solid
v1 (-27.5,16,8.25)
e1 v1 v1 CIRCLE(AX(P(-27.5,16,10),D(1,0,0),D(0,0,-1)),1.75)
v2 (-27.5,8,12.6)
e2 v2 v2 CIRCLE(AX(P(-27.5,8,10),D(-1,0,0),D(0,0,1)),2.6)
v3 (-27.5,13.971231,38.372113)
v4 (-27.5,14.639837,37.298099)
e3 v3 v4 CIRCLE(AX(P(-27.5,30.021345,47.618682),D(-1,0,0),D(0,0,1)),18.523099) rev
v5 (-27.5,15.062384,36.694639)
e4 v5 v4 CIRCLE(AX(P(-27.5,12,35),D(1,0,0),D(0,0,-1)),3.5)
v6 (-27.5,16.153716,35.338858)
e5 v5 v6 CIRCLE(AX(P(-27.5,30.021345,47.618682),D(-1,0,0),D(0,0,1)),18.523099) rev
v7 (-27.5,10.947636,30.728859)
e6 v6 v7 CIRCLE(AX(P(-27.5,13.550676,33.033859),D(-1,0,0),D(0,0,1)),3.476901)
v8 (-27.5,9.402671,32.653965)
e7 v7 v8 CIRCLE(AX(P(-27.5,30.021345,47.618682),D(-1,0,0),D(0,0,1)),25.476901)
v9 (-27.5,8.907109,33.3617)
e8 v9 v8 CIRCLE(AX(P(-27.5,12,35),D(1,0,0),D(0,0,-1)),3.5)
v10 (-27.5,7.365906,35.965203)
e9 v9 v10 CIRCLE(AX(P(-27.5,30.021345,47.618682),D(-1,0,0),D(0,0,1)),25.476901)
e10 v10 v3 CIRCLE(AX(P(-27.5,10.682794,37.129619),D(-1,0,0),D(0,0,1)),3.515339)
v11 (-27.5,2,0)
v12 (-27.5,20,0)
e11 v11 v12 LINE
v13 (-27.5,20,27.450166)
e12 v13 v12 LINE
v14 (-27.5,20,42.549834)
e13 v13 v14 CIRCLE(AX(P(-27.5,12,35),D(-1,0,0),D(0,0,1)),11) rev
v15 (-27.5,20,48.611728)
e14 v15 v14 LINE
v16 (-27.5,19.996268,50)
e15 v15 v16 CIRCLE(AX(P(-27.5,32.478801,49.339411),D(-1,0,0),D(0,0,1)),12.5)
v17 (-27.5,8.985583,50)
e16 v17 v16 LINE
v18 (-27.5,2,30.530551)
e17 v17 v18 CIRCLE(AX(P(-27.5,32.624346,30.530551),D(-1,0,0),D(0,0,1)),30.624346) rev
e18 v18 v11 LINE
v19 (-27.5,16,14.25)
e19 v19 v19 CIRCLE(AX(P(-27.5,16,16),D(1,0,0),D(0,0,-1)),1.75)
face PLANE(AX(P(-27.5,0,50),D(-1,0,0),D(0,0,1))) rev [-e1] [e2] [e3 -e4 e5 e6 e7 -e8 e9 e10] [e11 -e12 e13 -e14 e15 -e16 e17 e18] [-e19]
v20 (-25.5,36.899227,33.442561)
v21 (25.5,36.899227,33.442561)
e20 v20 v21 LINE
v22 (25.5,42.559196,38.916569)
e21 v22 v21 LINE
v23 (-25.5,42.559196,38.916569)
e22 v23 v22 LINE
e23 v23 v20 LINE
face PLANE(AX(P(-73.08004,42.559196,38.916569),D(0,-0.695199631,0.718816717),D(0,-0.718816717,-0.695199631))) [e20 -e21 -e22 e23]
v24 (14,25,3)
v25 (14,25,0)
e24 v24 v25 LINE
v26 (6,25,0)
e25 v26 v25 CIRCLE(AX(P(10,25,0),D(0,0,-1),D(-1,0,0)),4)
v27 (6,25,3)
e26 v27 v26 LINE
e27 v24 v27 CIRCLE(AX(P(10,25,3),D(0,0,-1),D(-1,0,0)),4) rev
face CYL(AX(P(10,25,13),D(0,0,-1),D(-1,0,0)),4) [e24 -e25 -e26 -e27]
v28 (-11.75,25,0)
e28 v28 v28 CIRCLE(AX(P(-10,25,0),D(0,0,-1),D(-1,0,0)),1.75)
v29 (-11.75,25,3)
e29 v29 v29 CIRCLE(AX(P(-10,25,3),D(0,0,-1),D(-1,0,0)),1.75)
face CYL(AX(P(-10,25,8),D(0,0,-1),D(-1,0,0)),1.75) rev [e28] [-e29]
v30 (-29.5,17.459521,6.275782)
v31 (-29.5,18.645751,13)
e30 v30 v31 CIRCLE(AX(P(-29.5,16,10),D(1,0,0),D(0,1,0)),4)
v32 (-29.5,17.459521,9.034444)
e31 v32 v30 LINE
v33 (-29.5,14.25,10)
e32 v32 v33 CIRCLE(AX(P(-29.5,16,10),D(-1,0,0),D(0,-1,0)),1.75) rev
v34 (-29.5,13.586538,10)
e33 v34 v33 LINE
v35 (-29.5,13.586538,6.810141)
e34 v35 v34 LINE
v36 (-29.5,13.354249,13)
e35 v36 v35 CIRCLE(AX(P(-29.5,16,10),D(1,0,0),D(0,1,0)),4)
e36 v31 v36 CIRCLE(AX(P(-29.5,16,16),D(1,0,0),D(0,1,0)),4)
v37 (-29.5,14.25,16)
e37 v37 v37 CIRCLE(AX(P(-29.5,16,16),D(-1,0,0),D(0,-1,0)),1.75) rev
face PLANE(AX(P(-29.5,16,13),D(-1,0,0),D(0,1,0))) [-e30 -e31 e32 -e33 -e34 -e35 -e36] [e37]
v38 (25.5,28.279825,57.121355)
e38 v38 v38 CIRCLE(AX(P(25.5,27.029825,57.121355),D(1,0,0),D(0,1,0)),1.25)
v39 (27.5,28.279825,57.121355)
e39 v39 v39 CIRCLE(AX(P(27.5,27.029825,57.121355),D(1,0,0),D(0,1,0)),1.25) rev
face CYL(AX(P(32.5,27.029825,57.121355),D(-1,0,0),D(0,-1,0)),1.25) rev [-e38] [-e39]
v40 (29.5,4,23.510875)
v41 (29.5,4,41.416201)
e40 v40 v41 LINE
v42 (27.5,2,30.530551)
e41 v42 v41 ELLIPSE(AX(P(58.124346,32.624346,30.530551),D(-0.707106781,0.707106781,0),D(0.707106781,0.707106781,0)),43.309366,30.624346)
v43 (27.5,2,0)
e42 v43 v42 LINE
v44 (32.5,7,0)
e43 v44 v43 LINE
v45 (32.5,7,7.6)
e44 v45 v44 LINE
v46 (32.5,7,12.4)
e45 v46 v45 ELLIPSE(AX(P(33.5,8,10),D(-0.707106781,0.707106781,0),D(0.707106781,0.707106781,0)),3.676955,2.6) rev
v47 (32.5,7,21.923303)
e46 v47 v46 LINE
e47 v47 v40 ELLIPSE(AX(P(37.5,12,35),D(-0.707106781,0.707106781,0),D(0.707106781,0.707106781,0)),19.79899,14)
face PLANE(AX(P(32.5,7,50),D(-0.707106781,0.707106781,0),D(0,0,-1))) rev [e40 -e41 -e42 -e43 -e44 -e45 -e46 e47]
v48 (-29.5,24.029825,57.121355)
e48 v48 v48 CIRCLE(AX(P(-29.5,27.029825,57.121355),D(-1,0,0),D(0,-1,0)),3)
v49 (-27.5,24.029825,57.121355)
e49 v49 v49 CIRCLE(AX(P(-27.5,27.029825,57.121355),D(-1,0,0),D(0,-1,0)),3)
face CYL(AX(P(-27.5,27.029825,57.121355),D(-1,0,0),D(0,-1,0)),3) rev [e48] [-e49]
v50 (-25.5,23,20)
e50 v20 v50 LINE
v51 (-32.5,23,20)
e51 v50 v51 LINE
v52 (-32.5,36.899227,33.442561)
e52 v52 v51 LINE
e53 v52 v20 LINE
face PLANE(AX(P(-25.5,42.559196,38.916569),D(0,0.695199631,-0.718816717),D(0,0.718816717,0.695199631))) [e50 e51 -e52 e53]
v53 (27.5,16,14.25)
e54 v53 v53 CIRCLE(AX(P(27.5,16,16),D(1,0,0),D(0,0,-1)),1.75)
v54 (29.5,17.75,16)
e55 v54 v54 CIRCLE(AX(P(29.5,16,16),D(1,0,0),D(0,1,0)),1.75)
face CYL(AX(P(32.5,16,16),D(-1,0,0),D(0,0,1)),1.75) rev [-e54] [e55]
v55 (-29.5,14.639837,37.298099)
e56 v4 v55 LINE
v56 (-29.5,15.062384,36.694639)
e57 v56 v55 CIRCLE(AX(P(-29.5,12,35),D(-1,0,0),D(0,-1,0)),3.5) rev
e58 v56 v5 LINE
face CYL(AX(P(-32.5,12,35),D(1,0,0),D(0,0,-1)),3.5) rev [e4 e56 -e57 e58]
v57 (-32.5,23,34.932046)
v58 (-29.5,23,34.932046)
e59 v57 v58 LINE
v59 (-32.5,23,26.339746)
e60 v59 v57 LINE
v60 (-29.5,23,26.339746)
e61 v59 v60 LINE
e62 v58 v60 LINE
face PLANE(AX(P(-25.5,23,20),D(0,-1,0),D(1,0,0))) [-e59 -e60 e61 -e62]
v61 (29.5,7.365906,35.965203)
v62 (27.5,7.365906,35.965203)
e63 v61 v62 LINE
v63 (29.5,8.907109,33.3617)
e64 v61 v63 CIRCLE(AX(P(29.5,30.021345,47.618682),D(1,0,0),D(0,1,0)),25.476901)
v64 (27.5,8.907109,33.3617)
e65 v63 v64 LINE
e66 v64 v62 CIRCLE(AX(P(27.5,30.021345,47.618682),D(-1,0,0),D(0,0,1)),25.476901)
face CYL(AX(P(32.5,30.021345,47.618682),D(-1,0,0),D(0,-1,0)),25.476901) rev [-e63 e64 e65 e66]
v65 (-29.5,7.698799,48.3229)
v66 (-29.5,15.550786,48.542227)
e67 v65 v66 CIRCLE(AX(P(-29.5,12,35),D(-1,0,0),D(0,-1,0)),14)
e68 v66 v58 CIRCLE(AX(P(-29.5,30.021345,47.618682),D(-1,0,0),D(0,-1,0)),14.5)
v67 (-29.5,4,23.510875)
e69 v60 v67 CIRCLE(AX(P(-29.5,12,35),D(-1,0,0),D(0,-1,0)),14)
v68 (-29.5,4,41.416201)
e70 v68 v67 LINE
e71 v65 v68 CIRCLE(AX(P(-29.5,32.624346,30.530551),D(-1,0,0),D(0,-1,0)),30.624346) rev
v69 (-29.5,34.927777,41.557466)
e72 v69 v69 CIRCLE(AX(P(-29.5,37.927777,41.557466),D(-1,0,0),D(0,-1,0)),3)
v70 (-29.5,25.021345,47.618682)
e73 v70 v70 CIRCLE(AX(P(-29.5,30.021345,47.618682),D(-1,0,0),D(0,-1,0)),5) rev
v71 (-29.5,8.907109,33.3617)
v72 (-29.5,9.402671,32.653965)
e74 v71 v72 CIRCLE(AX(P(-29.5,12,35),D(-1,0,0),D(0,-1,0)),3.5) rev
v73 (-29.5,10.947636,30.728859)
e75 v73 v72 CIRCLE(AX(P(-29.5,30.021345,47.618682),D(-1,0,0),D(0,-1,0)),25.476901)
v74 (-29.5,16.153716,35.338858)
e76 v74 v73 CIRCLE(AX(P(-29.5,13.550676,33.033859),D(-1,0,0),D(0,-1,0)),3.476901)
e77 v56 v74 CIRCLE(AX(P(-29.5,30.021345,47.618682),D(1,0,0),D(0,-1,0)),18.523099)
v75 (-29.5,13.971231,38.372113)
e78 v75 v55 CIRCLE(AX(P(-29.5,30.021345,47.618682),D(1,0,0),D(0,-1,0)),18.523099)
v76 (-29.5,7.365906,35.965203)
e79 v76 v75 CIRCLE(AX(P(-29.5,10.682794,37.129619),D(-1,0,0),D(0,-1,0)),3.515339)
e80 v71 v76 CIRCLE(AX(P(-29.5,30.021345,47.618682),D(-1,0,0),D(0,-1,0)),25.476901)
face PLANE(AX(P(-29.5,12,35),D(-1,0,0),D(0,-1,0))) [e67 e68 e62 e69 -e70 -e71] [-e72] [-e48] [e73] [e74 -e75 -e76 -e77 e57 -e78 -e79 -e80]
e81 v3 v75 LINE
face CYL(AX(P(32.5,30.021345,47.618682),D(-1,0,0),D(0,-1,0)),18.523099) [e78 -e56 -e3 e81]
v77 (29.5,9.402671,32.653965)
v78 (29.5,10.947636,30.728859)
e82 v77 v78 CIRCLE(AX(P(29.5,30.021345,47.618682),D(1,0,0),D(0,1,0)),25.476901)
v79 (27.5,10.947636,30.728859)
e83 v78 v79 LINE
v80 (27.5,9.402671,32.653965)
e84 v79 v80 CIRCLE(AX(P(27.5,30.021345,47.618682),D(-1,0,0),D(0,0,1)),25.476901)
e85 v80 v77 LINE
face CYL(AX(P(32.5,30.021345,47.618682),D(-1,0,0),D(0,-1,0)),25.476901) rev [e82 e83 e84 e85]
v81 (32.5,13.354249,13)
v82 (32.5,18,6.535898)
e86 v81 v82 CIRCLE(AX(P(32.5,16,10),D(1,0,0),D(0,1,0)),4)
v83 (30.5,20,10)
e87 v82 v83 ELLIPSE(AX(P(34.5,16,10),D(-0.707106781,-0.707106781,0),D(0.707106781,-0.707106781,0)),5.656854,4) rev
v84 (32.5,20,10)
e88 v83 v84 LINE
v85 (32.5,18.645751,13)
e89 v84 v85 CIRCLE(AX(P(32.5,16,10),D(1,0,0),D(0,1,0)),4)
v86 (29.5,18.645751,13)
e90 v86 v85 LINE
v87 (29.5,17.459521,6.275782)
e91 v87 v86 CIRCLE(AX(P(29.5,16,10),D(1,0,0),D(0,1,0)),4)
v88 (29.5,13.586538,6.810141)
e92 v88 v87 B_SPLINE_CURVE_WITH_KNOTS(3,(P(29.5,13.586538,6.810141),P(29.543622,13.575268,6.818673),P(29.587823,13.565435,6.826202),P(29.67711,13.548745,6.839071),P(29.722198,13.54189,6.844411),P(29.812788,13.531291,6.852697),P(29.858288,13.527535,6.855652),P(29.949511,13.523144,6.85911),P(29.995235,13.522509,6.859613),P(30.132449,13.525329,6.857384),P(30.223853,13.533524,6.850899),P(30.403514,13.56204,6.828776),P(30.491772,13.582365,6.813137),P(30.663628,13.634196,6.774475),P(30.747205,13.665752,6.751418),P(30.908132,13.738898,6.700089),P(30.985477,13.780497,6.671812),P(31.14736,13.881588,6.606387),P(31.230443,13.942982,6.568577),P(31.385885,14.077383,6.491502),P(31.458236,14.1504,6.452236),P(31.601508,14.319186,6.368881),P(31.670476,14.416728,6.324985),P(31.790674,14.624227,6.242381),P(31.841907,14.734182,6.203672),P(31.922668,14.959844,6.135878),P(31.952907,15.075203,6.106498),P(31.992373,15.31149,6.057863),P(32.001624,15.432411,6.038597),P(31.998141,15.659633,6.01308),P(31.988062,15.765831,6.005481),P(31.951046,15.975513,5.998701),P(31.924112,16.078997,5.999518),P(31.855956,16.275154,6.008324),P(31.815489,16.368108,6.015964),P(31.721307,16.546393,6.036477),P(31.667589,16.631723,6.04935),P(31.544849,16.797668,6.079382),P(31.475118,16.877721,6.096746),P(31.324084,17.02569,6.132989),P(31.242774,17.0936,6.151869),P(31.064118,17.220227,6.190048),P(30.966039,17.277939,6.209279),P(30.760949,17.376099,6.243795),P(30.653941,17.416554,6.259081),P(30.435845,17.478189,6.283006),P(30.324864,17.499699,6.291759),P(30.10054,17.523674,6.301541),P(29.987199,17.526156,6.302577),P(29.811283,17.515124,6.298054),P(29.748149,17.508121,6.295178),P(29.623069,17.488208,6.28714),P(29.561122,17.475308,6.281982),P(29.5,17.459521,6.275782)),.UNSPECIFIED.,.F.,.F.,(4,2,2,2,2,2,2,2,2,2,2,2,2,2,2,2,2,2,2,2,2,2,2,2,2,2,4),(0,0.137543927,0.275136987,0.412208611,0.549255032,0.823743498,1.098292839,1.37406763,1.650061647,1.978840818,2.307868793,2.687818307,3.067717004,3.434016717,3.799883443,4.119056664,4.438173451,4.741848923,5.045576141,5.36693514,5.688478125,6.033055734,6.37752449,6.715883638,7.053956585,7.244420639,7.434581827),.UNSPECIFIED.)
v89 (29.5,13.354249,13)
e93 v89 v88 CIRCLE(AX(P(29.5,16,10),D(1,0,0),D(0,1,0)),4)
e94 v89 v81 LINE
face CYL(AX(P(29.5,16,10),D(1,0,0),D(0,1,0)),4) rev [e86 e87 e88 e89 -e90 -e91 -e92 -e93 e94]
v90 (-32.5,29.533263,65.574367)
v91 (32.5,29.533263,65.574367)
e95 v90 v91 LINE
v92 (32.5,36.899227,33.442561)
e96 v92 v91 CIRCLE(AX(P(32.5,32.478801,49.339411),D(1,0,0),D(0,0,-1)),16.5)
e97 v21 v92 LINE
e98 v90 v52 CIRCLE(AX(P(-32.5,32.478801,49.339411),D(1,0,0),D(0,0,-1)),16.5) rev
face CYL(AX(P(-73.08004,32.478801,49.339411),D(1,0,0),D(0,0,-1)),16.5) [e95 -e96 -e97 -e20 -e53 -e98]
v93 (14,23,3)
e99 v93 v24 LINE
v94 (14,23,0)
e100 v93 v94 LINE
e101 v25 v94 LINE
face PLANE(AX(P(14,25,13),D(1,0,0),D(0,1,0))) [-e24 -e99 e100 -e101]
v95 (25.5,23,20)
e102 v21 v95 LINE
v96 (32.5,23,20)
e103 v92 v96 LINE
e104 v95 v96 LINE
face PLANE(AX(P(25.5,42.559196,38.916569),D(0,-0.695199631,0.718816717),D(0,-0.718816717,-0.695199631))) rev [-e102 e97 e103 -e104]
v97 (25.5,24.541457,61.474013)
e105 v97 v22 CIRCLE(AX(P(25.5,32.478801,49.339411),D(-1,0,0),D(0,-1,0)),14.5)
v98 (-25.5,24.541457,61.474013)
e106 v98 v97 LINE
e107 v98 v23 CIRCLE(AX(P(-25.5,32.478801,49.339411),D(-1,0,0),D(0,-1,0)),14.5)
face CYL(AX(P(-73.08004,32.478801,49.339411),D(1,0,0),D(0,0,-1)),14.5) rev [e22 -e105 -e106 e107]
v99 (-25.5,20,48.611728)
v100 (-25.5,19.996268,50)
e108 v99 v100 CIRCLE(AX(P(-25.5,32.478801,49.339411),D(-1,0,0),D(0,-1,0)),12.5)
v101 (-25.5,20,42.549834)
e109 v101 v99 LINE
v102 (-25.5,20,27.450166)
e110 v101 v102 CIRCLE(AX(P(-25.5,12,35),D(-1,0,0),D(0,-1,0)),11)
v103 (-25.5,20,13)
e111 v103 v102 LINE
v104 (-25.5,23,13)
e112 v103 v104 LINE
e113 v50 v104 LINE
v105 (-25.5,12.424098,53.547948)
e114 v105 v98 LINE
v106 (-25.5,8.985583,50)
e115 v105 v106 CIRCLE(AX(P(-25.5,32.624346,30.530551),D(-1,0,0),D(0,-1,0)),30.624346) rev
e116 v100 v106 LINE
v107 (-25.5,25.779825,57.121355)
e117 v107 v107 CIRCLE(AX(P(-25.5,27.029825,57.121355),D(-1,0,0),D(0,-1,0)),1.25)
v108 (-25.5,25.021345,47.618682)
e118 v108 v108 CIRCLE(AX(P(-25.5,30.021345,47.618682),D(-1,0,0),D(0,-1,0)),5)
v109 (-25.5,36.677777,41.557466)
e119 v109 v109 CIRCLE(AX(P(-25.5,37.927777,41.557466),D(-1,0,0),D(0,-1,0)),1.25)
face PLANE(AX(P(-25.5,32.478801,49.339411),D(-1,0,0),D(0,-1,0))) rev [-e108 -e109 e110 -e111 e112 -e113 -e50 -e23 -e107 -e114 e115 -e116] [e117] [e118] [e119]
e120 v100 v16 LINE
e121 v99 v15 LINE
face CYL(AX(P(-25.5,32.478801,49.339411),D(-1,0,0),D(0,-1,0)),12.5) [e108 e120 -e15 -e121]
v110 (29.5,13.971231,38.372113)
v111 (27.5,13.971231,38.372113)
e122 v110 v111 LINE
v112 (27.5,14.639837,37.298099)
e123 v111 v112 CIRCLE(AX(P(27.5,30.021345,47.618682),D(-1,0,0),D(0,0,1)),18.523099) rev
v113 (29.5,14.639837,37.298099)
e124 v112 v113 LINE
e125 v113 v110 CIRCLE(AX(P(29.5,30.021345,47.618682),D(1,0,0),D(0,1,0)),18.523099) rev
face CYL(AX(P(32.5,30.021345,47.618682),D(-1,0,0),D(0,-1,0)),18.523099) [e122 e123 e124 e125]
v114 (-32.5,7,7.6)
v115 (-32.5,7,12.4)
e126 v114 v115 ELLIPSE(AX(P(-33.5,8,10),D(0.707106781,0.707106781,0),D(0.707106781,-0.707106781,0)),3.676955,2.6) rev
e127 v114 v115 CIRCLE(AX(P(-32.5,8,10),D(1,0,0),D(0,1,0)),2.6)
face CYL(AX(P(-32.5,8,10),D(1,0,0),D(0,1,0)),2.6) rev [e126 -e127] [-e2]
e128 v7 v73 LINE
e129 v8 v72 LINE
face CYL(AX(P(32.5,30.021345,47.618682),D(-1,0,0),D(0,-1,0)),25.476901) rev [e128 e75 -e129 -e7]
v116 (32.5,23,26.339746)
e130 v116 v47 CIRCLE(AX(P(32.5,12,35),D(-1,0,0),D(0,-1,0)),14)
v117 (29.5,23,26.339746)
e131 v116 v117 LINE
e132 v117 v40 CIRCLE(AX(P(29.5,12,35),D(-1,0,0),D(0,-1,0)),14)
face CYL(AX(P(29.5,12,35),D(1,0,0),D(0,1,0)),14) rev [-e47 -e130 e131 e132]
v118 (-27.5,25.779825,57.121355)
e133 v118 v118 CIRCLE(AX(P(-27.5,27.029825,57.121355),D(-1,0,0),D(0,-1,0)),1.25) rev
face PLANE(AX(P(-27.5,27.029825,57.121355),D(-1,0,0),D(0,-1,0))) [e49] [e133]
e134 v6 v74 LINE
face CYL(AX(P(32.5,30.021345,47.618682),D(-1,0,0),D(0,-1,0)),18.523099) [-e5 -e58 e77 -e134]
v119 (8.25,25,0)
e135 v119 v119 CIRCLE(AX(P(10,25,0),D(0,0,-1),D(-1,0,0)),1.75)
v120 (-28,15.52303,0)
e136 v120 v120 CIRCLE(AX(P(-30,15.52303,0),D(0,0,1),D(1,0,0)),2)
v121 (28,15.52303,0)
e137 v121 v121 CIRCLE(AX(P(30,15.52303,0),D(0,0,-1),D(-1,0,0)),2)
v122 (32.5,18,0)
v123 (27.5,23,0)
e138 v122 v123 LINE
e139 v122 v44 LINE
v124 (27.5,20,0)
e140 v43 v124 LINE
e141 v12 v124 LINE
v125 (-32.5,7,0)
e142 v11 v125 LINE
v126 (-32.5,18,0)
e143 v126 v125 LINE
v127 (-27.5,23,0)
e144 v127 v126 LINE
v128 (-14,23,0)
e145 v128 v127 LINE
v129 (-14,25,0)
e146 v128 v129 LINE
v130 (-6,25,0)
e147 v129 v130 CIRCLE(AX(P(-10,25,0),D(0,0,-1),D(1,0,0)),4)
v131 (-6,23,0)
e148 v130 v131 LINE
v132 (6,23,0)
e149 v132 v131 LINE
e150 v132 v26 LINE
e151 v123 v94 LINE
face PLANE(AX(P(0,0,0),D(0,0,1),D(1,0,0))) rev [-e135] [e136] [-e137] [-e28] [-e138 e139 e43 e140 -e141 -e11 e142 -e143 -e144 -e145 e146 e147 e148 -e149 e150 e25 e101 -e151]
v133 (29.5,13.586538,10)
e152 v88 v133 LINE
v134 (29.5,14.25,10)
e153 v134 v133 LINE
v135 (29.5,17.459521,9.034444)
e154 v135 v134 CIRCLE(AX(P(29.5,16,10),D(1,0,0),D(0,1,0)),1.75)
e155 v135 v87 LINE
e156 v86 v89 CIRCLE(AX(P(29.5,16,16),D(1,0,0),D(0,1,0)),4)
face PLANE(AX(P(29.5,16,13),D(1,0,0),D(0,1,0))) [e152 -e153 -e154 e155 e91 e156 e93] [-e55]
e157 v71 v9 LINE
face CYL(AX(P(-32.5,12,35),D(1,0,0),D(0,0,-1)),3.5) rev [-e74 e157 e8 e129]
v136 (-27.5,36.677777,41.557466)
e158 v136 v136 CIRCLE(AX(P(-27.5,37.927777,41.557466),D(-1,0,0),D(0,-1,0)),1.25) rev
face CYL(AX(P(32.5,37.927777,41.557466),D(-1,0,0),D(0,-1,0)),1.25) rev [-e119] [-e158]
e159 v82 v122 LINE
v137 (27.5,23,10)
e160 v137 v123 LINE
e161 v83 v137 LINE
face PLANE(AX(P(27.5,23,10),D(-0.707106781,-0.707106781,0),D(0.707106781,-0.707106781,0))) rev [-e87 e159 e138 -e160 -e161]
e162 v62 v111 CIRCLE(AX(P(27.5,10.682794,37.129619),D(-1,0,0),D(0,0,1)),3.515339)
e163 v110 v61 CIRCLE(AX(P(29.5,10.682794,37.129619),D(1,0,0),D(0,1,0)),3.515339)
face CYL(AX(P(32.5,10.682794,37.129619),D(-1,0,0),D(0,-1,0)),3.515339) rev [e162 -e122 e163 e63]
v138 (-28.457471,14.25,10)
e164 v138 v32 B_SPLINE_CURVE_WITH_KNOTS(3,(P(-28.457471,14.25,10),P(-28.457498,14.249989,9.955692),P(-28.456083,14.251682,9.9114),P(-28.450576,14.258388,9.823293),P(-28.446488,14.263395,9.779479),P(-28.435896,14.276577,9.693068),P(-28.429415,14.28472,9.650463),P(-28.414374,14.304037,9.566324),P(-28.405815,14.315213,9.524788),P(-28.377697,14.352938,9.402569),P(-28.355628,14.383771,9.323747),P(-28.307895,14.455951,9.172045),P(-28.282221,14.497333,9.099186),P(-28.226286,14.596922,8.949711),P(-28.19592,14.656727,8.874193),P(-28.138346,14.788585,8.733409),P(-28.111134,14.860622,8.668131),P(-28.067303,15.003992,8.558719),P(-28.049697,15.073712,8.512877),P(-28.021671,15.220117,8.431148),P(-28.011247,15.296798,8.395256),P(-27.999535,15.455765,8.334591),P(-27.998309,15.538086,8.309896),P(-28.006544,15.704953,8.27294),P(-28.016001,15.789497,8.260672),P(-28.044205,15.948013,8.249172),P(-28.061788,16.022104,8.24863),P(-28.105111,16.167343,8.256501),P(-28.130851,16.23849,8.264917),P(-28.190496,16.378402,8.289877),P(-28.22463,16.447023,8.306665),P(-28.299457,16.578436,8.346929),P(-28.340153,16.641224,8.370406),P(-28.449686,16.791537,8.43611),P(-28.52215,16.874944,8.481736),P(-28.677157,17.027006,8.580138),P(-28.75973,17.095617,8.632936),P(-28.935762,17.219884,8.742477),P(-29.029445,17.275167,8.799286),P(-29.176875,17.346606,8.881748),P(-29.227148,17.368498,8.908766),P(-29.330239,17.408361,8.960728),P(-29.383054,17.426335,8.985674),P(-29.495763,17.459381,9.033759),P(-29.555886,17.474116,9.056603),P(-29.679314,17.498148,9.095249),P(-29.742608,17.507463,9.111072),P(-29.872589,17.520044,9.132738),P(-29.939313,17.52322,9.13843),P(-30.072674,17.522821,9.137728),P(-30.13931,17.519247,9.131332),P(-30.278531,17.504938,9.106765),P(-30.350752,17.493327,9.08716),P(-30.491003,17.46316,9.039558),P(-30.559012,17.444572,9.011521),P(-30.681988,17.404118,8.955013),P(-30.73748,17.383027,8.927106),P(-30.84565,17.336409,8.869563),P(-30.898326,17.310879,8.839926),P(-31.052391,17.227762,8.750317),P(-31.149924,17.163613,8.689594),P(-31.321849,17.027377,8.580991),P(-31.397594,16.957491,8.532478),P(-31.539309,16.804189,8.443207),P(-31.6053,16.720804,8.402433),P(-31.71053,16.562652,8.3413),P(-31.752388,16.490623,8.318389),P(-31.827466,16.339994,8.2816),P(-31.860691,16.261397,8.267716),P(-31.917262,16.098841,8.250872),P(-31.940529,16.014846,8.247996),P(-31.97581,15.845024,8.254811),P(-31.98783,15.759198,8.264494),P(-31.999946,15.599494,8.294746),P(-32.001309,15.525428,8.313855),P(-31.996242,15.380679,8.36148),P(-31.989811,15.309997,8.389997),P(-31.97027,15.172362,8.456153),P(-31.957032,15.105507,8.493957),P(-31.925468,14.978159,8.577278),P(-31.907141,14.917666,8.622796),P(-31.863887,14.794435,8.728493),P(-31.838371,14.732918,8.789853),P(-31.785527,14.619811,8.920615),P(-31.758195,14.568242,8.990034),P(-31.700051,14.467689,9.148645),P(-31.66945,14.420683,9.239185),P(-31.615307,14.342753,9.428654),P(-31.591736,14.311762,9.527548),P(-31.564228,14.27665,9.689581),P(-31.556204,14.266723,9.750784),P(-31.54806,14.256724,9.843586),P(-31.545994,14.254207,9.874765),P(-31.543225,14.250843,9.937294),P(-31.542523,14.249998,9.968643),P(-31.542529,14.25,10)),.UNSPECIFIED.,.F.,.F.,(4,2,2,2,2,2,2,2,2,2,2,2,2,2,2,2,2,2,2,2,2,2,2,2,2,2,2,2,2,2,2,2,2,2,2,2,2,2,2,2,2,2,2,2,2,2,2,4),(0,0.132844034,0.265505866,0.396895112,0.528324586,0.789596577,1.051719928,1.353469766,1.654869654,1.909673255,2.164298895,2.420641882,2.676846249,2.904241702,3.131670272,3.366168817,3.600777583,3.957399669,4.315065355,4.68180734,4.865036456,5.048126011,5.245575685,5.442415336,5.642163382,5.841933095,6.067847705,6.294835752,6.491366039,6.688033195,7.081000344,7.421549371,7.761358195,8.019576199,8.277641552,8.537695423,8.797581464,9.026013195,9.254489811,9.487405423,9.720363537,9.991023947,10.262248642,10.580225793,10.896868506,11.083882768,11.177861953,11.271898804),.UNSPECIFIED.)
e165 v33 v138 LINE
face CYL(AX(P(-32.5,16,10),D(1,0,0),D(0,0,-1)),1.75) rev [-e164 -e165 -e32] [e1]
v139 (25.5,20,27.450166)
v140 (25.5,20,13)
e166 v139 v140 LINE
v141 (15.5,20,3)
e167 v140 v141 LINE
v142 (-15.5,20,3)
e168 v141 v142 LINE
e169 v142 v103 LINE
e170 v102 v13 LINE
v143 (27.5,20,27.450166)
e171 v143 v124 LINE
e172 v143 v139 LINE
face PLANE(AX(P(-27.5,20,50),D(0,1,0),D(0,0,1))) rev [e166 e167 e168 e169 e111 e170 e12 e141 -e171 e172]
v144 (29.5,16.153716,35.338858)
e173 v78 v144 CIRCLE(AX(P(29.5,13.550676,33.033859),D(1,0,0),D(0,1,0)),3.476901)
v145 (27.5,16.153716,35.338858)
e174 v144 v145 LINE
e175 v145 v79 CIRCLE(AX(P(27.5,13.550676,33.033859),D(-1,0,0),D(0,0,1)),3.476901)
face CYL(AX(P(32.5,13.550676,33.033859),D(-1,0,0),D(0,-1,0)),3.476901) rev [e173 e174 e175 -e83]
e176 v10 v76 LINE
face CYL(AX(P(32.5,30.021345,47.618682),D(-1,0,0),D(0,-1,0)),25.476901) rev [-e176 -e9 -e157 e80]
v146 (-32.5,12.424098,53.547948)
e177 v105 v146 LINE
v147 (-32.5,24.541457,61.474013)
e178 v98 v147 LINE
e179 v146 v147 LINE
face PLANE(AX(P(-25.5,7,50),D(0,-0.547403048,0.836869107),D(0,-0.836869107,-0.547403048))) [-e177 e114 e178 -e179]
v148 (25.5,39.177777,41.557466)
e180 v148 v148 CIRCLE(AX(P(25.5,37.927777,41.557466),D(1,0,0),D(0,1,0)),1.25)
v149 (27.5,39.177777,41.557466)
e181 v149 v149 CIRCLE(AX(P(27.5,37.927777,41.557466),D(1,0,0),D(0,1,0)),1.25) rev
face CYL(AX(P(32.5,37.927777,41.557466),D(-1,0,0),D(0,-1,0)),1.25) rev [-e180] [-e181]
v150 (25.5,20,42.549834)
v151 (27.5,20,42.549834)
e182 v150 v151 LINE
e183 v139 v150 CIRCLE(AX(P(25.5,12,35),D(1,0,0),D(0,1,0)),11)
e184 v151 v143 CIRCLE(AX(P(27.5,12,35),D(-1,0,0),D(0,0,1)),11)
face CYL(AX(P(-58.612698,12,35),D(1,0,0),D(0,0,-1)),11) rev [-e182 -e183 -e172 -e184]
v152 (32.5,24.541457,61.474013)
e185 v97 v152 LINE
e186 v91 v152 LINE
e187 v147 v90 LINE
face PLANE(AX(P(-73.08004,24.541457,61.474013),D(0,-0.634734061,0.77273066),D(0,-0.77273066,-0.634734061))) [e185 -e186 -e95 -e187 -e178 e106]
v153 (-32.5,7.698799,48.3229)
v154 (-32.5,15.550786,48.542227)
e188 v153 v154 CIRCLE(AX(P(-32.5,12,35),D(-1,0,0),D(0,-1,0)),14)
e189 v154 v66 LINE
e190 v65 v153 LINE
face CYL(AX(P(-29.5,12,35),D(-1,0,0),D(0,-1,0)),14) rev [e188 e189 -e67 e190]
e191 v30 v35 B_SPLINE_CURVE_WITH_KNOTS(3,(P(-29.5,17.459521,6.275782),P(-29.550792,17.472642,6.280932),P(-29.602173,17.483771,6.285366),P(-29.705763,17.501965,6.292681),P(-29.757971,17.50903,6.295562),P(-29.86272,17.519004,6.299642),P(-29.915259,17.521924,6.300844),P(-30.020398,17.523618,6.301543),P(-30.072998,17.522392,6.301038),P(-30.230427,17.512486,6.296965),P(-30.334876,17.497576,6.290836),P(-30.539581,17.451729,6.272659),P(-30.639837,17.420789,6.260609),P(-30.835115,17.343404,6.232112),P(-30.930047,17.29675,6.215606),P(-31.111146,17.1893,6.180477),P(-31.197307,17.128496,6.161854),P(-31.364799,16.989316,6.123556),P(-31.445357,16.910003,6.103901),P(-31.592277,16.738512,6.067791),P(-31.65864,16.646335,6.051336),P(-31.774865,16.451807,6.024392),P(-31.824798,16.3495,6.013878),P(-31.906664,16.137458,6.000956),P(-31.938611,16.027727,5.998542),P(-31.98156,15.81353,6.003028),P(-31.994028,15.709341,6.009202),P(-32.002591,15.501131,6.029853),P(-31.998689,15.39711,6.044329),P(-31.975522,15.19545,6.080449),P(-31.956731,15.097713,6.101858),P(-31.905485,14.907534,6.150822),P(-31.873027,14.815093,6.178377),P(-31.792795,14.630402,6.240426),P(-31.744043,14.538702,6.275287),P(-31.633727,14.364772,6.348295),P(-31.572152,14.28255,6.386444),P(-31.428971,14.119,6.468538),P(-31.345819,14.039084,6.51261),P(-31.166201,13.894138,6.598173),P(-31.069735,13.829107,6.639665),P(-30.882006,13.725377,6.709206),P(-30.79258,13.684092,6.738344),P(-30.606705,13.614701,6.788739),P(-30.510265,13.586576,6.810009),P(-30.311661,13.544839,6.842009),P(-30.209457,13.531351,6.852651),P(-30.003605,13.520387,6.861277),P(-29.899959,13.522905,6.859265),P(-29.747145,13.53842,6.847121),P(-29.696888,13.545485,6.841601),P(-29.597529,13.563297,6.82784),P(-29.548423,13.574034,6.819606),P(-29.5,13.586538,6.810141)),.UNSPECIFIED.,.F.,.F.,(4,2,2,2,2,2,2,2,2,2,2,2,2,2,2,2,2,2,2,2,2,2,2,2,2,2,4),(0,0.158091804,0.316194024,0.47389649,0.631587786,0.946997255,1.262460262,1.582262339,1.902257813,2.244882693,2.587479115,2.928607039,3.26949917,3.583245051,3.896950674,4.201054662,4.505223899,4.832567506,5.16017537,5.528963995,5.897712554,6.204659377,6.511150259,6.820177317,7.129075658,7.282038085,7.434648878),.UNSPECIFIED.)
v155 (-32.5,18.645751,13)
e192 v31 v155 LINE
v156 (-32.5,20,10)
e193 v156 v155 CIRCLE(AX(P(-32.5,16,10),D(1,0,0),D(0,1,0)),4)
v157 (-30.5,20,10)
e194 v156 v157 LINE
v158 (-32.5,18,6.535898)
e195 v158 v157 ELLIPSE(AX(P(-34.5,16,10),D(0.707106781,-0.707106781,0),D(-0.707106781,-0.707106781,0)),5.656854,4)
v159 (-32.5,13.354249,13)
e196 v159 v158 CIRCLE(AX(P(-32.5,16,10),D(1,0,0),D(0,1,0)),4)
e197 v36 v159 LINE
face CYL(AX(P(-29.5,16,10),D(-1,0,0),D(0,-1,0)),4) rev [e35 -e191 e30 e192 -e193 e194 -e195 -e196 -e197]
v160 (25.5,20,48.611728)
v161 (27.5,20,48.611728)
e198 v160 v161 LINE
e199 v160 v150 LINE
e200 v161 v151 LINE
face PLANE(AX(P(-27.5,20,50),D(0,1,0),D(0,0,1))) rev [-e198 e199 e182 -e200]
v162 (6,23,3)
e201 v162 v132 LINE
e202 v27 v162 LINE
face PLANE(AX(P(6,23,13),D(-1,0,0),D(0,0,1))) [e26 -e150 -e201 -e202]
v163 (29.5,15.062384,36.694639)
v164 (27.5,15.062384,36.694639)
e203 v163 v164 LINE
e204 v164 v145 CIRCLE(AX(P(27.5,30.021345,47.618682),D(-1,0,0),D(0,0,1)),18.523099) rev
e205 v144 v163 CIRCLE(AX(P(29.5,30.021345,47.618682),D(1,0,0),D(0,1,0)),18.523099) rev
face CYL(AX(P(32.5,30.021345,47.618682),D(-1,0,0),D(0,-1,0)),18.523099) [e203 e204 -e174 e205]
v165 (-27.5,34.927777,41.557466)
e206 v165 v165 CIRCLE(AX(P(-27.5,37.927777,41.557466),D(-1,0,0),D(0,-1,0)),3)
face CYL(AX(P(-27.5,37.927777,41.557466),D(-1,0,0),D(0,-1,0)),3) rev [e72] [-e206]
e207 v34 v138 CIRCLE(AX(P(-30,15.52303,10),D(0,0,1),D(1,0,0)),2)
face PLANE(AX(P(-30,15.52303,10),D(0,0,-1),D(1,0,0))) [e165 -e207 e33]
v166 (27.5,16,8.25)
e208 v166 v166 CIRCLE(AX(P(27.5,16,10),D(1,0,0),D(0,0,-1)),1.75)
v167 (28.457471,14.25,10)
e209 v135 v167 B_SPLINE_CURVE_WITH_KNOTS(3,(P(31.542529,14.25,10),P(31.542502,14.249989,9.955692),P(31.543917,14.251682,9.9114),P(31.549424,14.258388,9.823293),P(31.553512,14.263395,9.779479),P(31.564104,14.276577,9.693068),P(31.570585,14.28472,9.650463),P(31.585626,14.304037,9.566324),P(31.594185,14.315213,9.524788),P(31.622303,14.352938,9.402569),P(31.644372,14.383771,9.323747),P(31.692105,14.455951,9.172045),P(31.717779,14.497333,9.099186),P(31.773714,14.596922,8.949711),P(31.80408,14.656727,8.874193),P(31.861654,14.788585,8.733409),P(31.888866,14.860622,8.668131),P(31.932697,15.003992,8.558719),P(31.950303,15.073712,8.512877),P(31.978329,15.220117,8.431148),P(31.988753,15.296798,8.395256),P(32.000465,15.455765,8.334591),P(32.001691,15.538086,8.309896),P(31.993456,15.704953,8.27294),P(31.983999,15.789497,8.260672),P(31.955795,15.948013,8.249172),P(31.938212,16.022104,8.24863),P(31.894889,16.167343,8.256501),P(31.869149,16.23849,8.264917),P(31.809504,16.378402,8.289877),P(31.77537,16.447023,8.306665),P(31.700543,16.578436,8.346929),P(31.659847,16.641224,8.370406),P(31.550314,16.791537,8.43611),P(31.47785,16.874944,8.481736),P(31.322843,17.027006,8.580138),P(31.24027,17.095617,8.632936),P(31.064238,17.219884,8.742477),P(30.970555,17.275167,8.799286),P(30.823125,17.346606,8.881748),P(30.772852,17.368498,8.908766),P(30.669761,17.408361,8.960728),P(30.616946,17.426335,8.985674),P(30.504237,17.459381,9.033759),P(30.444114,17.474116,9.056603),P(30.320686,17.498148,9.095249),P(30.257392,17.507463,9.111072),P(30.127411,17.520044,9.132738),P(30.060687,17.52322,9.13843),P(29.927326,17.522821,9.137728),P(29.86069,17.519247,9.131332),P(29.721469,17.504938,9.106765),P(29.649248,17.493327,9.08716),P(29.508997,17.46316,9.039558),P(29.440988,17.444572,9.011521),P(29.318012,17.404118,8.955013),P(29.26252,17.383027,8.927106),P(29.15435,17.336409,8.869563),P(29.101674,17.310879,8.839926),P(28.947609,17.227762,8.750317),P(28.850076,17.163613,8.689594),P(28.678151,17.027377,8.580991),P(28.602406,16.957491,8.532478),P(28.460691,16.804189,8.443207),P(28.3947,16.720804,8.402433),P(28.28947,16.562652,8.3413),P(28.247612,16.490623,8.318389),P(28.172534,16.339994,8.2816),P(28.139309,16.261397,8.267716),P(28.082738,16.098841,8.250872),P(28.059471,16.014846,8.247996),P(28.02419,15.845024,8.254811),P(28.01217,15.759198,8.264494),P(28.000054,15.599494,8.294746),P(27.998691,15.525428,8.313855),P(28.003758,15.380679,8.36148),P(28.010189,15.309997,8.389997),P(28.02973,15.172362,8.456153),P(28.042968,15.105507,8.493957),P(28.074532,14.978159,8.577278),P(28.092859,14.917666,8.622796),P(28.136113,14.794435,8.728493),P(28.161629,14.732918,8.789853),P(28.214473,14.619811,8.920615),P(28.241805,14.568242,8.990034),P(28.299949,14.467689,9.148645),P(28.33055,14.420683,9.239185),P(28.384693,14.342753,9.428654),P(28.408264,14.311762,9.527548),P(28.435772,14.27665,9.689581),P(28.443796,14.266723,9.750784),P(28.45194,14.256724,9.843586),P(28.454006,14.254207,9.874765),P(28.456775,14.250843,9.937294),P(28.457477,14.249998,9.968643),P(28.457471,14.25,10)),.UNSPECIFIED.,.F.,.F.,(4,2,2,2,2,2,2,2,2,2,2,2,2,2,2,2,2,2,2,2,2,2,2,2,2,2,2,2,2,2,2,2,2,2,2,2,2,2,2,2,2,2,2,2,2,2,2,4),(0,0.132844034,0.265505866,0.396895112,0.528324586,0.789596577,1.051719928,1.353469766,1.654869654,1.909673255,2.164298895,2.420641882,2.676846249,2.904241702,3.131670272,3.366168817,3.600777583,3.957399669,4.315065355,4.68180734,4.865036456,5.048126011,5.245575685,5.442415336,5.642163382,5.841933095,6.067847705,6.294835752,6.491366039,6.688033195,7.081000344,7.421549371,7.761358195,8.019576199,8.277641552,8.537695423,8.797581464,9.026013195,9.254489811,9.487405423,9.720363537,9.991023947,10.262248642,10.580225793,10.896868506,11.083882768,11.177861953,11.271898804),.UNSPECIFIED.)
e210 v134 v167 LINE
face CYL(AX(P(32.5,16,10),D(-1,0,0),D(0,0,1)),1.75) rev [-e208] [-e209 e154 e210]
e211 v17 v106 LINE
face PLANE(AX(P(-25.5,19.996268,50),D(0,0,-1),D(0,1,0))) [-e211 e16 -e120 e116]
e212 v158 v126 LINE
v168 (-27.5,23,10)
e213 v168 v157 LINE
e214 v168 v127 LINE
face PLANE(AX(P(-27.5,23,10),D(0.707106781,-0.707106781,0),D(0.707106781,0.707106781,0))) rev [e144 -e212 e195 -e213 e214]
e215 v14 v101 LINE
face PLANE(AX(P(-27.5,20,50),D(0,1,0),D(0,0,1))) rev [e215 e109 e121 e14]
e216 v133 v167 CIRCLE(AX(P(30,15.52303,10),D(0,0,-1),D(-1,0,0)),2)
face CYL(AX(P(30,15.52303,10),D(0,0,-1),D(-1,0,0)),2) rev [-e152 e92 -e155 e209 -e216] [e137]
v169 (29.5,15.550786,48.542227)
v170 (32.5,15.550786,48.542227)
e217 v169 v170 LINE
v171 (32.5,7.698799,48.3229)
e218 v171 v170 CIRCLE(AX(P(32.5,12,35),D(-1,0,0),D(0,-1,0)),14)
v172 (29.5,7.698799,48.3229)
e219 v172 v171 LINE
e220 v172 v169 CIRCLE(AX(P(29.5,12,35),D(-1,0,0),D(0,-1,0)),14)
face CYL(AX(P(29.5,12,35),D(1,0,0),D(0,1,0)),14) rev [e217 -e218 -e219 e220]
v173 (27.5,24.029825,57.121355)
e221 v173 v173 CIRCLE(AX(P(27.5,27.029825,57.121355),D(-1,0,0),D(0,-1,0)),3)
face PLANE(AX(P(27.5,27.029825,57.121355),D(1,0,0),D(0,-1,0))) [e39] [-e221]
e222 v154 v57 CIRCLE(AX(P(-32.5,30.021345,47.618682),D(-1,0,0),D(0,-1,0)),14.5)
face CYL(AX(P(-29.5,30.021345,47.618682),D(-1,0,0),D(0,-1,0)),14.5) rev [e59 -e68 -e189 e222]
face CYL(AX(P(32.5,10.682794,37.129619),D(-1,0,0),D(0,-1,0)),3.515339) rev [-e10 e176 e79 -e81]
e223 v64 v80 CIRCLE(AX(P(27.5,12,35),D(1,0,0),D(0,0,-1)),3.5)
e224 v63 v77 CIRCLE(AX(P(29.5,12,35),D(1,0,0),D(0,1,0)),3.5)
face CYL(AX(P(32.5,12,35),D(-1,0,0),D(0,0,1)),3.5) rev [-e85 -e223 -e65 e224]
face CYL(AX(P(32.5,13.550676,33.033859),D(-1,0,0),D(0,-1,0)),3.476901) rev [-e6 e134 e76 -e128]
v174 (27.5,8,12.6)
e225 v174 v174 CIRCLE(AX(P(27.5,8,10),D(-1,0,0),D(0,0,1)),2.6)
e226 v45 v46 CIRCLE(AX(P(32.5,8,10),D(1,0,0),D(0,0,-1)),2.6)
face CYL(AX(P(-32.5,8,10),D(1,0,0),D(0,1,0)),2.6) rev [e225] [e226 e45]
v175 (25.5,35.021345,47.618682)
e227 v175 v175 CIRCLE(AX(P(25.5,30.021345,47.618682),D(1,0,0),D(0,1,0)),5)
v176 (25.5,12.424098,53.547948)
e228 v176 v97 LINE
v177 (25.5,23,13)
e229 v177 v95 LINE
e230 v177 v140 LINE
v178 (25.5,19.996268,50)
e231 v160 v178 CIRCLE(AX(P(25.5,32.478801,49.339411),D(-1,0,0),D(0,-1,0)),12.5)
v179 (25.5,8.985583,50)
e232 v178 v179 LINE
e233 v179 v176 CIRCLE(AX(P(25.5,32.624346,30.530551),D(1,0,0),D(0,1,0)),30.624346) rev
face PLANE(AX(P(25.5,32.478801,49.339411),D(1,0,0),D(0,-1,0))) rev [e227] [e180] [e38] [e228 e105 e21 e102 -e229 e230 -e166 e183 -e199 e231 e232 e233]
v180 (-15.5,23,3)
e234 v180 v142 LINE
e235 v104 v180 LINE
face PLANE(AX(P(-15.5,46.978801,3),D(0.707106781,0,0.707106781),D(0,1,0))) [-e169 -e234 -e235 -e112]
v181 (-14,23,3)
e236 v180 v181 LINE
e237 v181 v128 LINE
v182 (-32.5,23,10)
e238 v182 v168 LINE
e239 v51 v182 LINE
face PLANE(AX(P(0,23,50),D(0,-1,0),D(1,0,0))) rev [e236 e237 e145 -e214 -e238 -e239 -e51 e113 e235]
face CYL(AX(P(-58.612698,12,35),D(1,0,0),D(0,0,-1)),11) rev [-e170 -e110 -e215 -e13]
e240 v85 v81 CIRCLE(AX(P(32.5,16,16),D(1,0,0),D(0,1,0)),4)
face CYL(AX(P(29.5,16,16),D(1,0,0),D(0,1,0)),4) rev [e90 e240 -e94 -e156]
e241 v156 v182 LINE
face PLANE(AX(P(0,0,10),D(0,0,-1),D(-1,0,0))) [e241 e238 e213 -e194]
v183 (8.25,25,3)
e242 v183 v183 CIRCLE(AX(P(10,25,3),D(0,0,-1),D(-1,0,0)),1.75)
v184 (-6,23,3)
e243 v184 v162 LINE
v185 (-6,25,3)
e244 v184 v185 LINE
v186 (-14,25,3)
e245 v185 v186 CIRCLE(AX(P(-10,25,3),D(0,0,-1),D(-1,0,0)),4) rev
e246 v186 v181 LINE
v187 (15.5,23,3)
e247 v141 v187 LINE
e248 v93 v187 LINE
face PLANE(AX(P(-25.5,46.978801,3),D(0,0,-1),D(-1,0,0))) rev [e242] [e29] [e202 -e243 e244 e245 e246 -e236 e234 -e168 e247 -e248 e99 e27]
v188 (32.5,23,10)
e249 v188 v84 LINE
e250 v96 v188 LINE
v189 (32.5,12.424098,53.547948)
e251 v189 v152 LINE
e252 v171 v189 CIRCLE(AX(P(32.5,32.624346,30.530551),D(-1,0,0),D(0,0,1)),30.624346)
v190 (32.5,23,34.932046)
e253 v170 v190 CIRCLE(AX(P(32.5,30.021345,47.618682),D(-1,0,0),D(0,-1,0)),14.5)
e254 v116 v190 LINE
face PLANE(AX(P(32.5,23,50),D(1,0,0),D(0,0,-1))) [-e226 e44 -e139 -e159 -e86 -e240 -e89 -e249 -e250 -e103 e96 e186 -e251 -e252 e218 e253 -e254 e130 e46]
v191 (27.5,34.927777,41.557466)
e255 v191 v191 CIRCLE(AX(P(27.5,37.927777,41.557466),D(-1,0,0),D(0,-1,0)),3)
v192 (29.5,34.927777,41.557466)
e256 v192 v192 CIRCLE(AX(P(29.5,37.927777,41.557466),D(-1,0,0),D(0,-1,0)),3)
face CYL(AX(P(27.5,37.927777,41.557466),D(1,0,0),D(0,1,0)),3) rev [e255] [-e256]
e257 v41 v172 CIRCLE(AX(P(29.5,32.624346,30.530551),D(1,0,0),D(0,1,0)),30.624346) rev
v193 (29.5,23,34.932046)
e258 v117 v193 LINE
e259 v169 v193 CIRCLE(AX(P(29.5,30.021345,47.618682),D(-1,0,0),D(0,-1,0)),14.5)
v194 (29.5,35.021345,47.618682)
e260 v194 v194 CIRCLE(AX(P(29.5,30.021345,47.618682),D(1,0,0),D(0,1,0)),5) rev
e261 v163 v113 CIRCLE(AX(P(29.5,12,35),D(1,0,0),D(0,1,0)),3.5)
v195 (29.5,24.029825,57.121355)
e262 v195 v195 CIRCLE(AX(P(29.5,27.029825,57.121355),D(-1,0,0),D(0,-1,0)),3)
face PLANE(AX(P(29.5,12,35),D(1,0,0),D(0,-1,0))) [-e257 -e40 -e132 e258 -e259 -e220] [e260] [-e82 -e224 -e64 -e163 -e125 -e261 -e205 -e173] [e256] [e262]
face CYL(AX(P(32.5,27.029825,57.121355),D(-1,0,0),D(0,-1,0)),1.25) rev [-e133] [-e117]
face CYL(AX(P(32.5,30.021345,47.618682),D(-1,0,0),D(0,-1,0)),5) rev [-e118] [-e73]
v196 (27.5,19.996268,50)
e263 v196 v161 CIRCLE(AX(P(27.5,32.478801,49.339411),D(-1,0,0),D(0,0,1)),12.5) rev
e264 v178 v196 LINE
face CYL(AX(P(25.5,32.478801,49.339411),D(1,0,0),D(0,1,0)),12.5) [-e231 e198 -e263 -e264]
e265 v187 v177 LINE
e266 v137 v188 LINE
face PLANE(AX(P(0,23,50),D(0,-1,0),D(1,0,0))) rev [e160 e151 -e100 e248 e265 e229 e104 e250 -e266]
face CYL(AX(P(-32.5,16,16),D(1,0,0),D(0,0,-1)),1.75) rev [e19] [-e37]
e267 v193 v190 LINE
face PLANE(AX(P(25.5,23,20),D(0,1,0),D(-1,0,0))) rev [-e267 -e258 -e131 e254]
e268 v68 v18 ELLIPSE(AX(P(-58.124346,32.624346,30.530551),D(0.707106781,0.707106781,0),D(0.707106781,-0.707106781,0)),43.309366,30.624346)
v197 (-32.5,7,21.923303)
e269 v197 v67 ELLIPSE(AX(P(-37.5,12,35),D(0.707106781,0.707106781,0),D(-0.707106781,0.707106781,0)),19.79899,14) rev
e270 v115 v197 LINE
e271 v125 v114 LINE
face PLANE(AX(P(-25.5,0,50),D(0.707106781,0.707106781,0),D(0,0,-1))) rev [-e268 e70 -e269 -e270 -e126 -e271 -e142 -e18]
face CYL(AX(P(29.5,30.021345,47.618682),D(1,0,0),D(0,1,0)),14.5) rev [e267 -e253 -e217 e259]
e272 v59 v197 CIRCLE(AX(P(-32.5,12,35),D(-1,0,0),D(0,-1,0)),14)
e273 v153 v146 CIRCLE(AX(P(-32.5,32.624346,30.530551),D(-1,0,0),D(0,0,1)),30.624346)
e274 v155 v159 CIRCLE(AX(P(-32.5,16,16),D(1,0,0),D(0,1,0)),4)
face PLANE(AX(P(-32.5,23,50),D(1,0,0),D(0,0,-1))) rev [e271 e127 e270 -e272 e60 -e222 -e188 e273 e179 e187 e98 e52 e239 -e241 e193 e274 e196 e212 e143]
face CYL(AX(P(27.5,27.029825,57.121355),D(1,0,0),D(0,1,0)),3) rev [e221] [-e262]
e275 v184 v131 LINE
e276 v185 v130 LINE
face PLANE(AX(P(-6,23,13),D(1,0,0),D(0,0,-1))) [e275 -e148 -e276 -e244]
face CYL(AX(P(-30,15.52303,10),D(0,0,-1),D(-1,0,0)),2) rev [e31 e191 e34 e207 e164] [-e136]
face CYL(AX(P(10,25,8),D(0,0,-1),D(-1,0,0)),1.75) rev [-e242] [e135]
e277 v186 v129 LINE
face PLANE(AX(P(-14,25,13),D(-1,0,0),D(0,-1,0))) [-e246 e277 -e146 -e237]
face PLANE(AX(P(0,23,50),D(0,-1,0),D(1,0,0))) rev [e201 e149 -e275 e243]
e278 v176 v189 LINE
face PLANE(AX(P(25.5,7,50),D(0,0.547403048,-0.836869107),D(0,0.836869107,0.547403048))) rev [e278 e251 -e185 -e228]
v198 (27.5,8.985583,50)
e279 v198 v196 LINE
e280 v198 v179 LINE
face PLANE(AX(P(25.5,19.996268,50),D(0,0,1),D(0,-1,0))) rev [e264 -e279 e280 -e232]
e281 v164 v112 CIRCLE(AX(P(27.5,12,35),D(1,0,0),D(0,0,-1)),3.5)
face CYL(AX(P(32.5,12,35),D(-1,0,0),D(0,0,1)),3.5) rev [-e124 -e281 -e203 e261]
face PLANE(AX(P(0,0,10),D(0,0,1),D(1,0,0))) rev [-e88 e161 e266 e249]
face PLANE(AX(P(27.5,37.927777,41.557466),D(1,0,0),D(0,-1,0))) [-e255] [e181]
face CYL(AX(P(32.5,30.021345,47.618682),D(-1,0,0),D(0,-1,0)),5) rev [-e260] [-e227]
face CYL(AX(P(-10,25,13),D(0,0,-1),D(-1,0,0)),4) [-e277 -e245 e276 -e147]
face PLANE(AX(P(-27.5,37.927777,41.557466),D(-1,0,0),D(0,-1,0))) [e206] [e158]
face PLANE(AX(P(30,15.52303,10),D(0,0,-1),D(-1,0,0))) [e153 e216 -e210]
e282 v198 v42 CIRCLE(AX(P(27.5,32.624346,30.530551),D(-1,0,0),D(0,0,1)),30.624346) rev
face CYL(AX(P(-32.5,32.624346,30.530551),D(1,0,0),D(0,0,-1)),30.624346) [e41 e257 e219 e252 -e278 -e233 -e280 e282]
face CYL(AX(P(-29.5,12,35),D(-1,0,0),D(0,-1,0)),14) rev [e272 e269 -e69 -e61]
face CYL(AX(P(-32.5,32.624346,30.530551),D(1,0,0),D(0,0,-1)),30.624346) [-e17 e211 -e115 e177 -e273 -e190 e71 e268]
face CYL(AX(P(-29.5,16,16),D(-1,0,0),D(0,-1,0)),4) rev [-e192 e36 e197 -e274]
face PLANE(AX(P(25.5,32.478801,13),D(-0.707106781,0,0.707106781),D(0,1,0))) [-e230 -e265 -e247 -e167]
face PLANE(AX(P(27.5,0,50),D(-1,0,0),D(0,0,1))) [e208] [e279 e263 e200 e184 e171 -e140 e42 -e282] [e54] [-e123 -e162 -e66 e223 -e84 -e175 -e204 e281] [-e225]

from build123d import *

# Parameters (mm, degrees)
BOSS_EXTRUDE1_DEPTH             = 50
CHAMFER1_SIZE                   = 7
SKETCH2_R                       = 3.5
CUT_EXTRUDE1_DEPTH              = 62.524385409
SKETCH3_R                       = 1.75
CUT_EXTRUDE2_DEPTH              = 62.524385409
SKETCH5_R                       = 14
CUT_EXTRUDE4_DEPTH              = 3
BOSS_EXTRUDE2_DEPTH             = 7
CUT_EXTRUDE3_DEPTH              = 77.547867994
CUT_EXTRUDE3_DEPTH_BACK         = 77.547867994
SKETCH4_W                       = 51
SKETCH4_H                       = 47
SKETCH7_R                       = 1.25
SKETCH7_R_2                     = 5
CUT_EXTRUDE5_DEPTH              = 103.505990745
SKETCH8_R                       = 14.5
CUT_EXTRUDE6_DEPTH              = 3
SKETCH9_R                       = 3
CUT_EXTRUDE7_DEPTH              = 2
SKETCH11_R                      = 2
CUT_EXTRUDE8_DEPTH              = 10
BOSS_EXTRUDE3_START             = -32.5
BOSS_EXTRUDE3_DEPTH             = 65
SKETCH12_R                      = 2.6
CUT_EXTRUDE9_DEPTH              = 105.684053225
CUT_EXTRUDE10_DEPTH             = 3
BOSS_EXTRUDE4_DEPTH             = 3
SKETCH16_R                      = 1.75
CUT_EXTRUDE12_DEPTH             = 8
CHAMFER2_SIZE                   = 10
CUT_EXTRUDE14_DEPTH             = 10
CUT_EXTRUDE15_DEPTH             = 89.260982281
CUT_EXTRUDE15_DEPTH_BACK        = 89.260982281
CUT_EXTRUDE16_REACH             = 90.261
SKETCH19_R                      = 11
CUT_EXTRUDE16_DIRECTION_2_REACH = 90.261
CUT_EXTRUDE17_DEPTH             = 103.848193952


# Read off the part's stored shape, not the designer's step: Mirror1
with BuildPart() as part:
    # Sketch1 → Boss-Extrude1 (new body)
    with BuildSketch(Plane.XY):
        Polygon((-27.5, 0), (-27.5, 20), (0, 20), (0, 23), (-32.5, 23), (-32.5, 0), align=None)
    extrude(amount=BOSS_EXTRUDE1_DEPTH)

    # Chamfer1
    # the kernel refuses this chamfer: 7 mm, written as the material it takes off along each edge
    with BuildSketch(Plane(origin=(-32.5, 0, -18.001780916), x_dir=(-0.02749587661058612, 0.9996219169112968, 0), z_dir=(0, 0, 1))) as chamfer1_piece_1:
        Polygon((CHAMFER1_SIZE * 0.999621916911, -CHAMFER1_SIZE * 0.0274958766106), (-CHAMFER1_SIZE * 0.0274958766106, -CHAMFER1_SIZE * 0.999621916911), (0, 0), align=None)
    extrude(amount=86.003561832, mode=Mode.SUBTRACT)

    # Sketch2 → Cut-Extrude1 (cut, through all)
    with BuildSketch(Plane(origin=(-27.5, 0, 0), x_dir=(0, 0, -1), z_dir=(1, 0, 0))):
        with Locations((-35, 12)):
            Circle(SKETCH2_R)
    extrude(amount=-CUT_EXTRUDE1_DEPTH, mode=Mode.SUBTRACT)

    # Sketch3 → Cut-Extrude2 (cut, through all)
    with BuildSketch(Plane(origin=(-27.5, 0, 0), x_dir=(0, 0, -1), z_dir=(1, 0, 0))):
        with Locations((-10, 16)):
            Circle(SKETCH3_R)
        with Locations((-16, 16)):
            Circle(SKETCH3_R)
    extrude(amount=-CUT_EXTRUDE2_DEPTH, mode=Mode.SUBTRACT)

    # Sketch5 → Cut-Extrude4 (cut)
    with BuildSketch(Plane.ZY.offset(32.5)):
        with Locations((35, 12)):
            Circle(SKETCH5_R)
    extrude(amount=-CUT_EXTRUDE4_DEPTH, mode=Mode.SUBTRACT)

    # Sketch6 → Boss-Extrude2 (add)
    with BuildSketch(Plane.ZY.offset(32.5)):
        with BuildLine():
            Line((38.91656851, 42.559195759), (20, 23))
            Line((20, 23), (41.190648452, 23))
            ThreePointArc((41.190648452, 23), (45.305332833, 20.647646722), (50, 19.996268429))
            Line((50, 19.996268429), (50, 7))
            Line((50, 7), (61.474012963, 24.541456905))
            ThreePointArc((61.474012963, 24.541456905), (58.38884507, 43.808308659), (38.91656851, 42.559195759))
        make_face()
    extrude(amount=-BOSS_EXTRUDE2_DEPTH)

    # Mirror1: part across plane


with BuildPart() as part_1:
    add(part.part)
    add(part.part.mirror(Plane(origin=(0, 0, 0), x_dir=(0, 0, 1), z_dir=(1, 0, 0))))

    # Sketch4 → Cut-Extrude3 (cut, two sides: drawn at the far end of the back side and taken through both)
    with BuildSketch(Plane.XZ.offset(-20).offset(-CUT_EXTRUDE3_DEPTH_BACK)):
        with Locations((0, 26.5)):
            Rectangle(SKETCH4_W, SKETCH4_H)
    extrude(amount=CUT_EXTRUDE3_DEPTH + CUT_EXTRUDE3_DEPTH_BACK, mode=Mode.SUBTRACT)

    # Sketch7 → Cut-Extrude5 (cut, through all)
    with BuildSketch(Plane.ZY.offset(32.5)):
        with Locations(Location((41.557466488, 37.927777253, 0), (0, 0, 270))):
            Circle(SKETCH7_R)
        with Locations(Location((57.12135533, 27.029824962, 0), (0, 0, 270))):
            Circle(SKETCH7_R)
        with Locations(Location((47.6186816, 30.021344974, 0), (0, 0, 270))):
            Circle(SKETCH7_R_2)
    extrude(amount=-CUT_EXTRUDE5_DEPTH, mode=Mode.SUBTRACT)

    # Sketch8 → Cut-Extrude6 (cut)
    with BuildSketch(Plane.ZY.offset(32.5)):
        with Locations((47.6186816, 30.021344974)):
            Circle(SKETCH8_R)
    cut_extrude6 = extrude(amount=-CUT_EXTRUDE6_DEPTH, mode=Mode.SUBTRACT)

    # Sketch9 → Cut-Extrude7 (cut)
    with BuildSketch(Plane.ZY.offset(29.5)):
        with Locations(Location((41.557466488, 37.927777253, 0), (0, 0, 270))):
            Circle(SKETCH9_R)
        with Locations(Location((57.12135533, 27.029824962, 0), (0, 0, 270))):
            Circle(SKETCH9_R)
    cut_extrude7 = extrude(amount=-CUT_EXTRUDE7_DEPTH, mode=Mode.SUBTRACT)

    # Sketch11 → Cut-Extrude8 (cut)
    with BuildSketch(Plane(origin=(0, 0, 0), x_dir=(-1, 0, 0), z_dir=(0, 0, -1))):
        with Locations((-30, 15.523029521)):
            Circle(SKETCH11_R)
    cut_extrude8 = extrude(amount=-CUT_EXTRUDE8_DEPTH, mode=Mode.SUBTRACT)

    # Mirror2: Cut-Extrude6, Cut-Extrude7, Cut-Extrude8 across plane
    add(cut_extrude6.mirror(Plane(origin=(0, 0, 0), x_dir=(0, 0, 1), z_dir=(1, 0, 0))), mode=Mode.SUBTRACT)
    add(cut_extrude7.mirror(Plane(origin=(0, 0, 0), x_dir=(0, 0, 1), z_dir=(1, 0, 0))), mode=Mode.SUBTRACT)
    add(cut_extrude8.mirror(Plane(origin=(0, 0, 0), x_dir=(0, 0, 1), z_dir=(1, 0, 0))), mode=Mode.SUBTRACT)

    # Sketch10 → Boss-Extrude3 (add)
    with BuildSketch(Plane(origin=(0, 0, 0), x_dir=(0, 0, -1), z_dir=(1, 0, 0)).offset(BOSS_EXTRUDE3_START)):
        with BuildLine():
            Line((-38.91656851, 42.559195759), (-33.44256114, 36.899227268))
            ThreePointArc((-33.44256114, 36.899227268), (-53.026270805, 48.561620018), (-65.574367209, 29.533263138))
            Line((-65.574367209, 29.533263138), (-61.474012963, 24.541456905))
            ThreePointArc((-61.474012963, 24.541456905), (-58.38884507, 43.808308659), (-38.91656851, 42.559195759))
        make_face()
    extrude(amount=BOSS_EXTRUDE3_DEPTH)

    # Sketch12 → Cut-Extrude9 (cut, through all)
    with BuildSketch(Plane(origin=(32.5, 0, 0), x_dir=(0, 0, -1), z_dir=(1, 0, 0))):
        with Locations(Location((-10, 8, 0), (0, 0, 180))):
            Circle(SKETCH12_R)
    extrude(amount=-CUT_EXTRUDE9_DEPTH, mode=Mode.SUBTRACT)

    # Sketch13 → Cut-Extrude10 (cut)
    with BuildSketch(Plane(origin=(32.5, 0, 0), x_dir=(0, 0, -1), z_dir=(1, 0, 0))):
        with BuildLine():
            ThreePointArc((-13, 18.645751311), (-20, 16), (-13, 13.354248689))
            ThreePointArc((-13, 13.354248689), (-6, 16), (-13, 18.645751311))
        make_face()
    cut_extrude10 = extrude(amount=-CUT_EXTRUDE10_DEPTH, mode=Mode.SUBTRACT)

    # Mirror3: Cut-Extrude10 across plane
    add(cut_extrude10.mirror(Plane(origin=(0, 0, 0), x_dir=(0, 0, 1), z_dir=(1, 0, 0))), mode=Mode.SUBTRACT)

    # Sketch15 → Boss-Extrude4 (add)
    with BuildSketch(Plane(origin=(0, 0, 0), x_dir=(-1, 0, 0), z_dir=(0, 0, -1))):
        with BuildLine():
            Line((-14, 25), (-14, 23))
            Line((-14, 23), (-6, 23))
            Line((-6, 23), (-6, 25))
            ThreePointArc((-6, 25), (-10, 29), (-14, 25))
        make_face()
        with BuildLine():
            Line((6, 23), (6, 25))
            ThreePointArc((6, 25), (10, 29), (14, 25))
            Line((14, 25), (14, 23))
            Line((14, 23), (6, 23))
        make_face()
    extrude(amount=-BOSS_EXTRUDE4_DEPTH)

    # Sketch16 → Cut-Extrude12 (cut)
    with BuildSketch(Plane(origin=(0, 0, 0), x_dir=(-1, 0, 0), z_dir=(0, 0, -1))):
        with Locations((-10, 25)):
            Circle(SKETCH16_R)
        with Locations((10, 25)):
            Circle(SKETCH16_R)
    extrude(amount=-CUT_EXTRUDE12_DEPTH, mode=Mode.SUBTRACT)

    # Chamfer2
    chamfer2_edges = [part_1.edges().sort_by_distance(p)[0] for p in [
        (25.5, 21.5, 3),
        (-25.5, 21.5, 3),
    ]]
    chamfer(chamfer2_edges, length=CHAMFER2_SIZE)

    # Sketch17 → Cut-Extrude14 (cut)
    with BuildSketch(Plane(origin=(0, 0, 0), x_dir=(-1, 0, 0), z_dir=(0, 0, -1))):
        Polygon((-32.5, 18), (-32.5, 23), (-27.5, 23), align=None)
        Polygon((32.5, 23), (27.5, 23), (32.5, 18), align=None)
    extrude(amount=-CUT_EXTRUDE14_DEPTH, mode=Mode.SUBTRACT)

    # Sketch18 → Cut-Extrude15 (cut, two sides: drawn at the far end of the back side and taken through both)
    with BuildSketch(Plane(origin=(0, 0, 0), x_dir=(0, 0, -1), z_dir=(1, 0, 0)).offset(-CUT_EXTRUDE15_DEPTH_BACK)):
        with BuildLine():
            Line((-30.530550933, 2), (-50, 2))
            Line((-50, 2), (-58.261274719, 19.629826629))
            ThreePointArc((-58.261274719, 19.629826629), (-46.960735265, 6.780592155), (-30.530550933, 2))
        make_face()
    extrude(amount=CUT_EXTRUDE15_DEPTH + CUT_EXTRUDE15_DEPTH_BACK, mode=Mode.SUBTRACT)

    # Cut-Extrude16: up to this face of the body (flat: up to its plane)
    cut_extrude16_end = Plane(part_1.part.faces().sort_by_distance((-27.5, 11.293188811, 24.090581316))[0])
    # Sketch19 → Cut-Extrude16 (cut, up to the picked face)
    with BuildSketch(Plane(origin=(0, 0, 0), x_dir=(0, 0, -1), z_dir=(1, 0, 0)), mode=Mode.PRIVATE) as cut_extrude16_sk1:
        with Locations((-35, 12)):
            Circle(SKETCH19_R)
    cut_extrude16_tool1 = split(extrude(cut_extrude16_sk1.sketch, amount=-CUT_EXTRUDE16_REACH, mode=Mode.PRIVATE), bisect_by=cut_extrude16_end, keep=Keep.BOTH, mode=Mode.PRIVATE)
    add(cut_extrude16_tool1.solids().sort_by(Axis((0, 12, 35), (-1, 0, 0)))[0], mode=Mode.SUBTRACT)

    # Cut-Extrude16 direction 2: up to this face of the body (flat: up to its plane)
    cut_extrude16_direction_2_end = Plane(part_1.part.faces().sort_by_distance((27.5, 11.293188811, 24.090581316))[0])
    # Sketch19 → Cut-Extrude16 direction 2 (cut, up to the picked face)
    with BuildSketch(Plane(origin=(0, 0, 0), x_dir=(0, 0, -1), z_dir=(1, 0, 0)), mode=Mode.PRIVATE) as cut_extrude16_direction_2_sk1:
        with Locations((-35, 12)):
            Circle(SKETCH19_R)
    cut_extrude16_direction_2_tool1 = split(extrude(cut_extrude16_direction_2_sk1.sketch, amount=CUT_EXTRUDE16_DIRECTION_2_REACH, mode=Mode.PRIVATE), bisect_by=cut_extrude16_direction_2_end, keep=Keep.BOTH, mode=Mode.PRIVATE)
    add(cut_extrude16_direction_2_tool1.solids().sort_by(Axis((0, 12, 35), (1, 0, 0)))[0], mode=Mode.SUBTRACT)

    # Sketch20 → Cut-Extrude17 (cut, through all)
    with BuildSketch(Plane.ZY.offset(29.5)):
        with BuildLine():
            ThreePointArc((35.338857782, 16.153716102), (30.430818443, 15.855675228), (30.728859318, 10.947635889))
            ThreePointArc((30.728859318, 10.947635889), (33.235107626, 8.993143085), (35.965203237, 7.365905958))
            ThreePointArc((35.965203237, 7.365905958), (40.432511893, 9.479255027), (38.372112666, 13.971230754))
            ThreePointArc((38.372112666, 13.971230754), (36.800308025, 14.985787228), (35.338857782, 16.153716102))
        make_face()
    extrude(amount=-CUT_EXTRUDE17_DEPTH, mode=Mode.SUBTRACT)


solid = part_1.part
